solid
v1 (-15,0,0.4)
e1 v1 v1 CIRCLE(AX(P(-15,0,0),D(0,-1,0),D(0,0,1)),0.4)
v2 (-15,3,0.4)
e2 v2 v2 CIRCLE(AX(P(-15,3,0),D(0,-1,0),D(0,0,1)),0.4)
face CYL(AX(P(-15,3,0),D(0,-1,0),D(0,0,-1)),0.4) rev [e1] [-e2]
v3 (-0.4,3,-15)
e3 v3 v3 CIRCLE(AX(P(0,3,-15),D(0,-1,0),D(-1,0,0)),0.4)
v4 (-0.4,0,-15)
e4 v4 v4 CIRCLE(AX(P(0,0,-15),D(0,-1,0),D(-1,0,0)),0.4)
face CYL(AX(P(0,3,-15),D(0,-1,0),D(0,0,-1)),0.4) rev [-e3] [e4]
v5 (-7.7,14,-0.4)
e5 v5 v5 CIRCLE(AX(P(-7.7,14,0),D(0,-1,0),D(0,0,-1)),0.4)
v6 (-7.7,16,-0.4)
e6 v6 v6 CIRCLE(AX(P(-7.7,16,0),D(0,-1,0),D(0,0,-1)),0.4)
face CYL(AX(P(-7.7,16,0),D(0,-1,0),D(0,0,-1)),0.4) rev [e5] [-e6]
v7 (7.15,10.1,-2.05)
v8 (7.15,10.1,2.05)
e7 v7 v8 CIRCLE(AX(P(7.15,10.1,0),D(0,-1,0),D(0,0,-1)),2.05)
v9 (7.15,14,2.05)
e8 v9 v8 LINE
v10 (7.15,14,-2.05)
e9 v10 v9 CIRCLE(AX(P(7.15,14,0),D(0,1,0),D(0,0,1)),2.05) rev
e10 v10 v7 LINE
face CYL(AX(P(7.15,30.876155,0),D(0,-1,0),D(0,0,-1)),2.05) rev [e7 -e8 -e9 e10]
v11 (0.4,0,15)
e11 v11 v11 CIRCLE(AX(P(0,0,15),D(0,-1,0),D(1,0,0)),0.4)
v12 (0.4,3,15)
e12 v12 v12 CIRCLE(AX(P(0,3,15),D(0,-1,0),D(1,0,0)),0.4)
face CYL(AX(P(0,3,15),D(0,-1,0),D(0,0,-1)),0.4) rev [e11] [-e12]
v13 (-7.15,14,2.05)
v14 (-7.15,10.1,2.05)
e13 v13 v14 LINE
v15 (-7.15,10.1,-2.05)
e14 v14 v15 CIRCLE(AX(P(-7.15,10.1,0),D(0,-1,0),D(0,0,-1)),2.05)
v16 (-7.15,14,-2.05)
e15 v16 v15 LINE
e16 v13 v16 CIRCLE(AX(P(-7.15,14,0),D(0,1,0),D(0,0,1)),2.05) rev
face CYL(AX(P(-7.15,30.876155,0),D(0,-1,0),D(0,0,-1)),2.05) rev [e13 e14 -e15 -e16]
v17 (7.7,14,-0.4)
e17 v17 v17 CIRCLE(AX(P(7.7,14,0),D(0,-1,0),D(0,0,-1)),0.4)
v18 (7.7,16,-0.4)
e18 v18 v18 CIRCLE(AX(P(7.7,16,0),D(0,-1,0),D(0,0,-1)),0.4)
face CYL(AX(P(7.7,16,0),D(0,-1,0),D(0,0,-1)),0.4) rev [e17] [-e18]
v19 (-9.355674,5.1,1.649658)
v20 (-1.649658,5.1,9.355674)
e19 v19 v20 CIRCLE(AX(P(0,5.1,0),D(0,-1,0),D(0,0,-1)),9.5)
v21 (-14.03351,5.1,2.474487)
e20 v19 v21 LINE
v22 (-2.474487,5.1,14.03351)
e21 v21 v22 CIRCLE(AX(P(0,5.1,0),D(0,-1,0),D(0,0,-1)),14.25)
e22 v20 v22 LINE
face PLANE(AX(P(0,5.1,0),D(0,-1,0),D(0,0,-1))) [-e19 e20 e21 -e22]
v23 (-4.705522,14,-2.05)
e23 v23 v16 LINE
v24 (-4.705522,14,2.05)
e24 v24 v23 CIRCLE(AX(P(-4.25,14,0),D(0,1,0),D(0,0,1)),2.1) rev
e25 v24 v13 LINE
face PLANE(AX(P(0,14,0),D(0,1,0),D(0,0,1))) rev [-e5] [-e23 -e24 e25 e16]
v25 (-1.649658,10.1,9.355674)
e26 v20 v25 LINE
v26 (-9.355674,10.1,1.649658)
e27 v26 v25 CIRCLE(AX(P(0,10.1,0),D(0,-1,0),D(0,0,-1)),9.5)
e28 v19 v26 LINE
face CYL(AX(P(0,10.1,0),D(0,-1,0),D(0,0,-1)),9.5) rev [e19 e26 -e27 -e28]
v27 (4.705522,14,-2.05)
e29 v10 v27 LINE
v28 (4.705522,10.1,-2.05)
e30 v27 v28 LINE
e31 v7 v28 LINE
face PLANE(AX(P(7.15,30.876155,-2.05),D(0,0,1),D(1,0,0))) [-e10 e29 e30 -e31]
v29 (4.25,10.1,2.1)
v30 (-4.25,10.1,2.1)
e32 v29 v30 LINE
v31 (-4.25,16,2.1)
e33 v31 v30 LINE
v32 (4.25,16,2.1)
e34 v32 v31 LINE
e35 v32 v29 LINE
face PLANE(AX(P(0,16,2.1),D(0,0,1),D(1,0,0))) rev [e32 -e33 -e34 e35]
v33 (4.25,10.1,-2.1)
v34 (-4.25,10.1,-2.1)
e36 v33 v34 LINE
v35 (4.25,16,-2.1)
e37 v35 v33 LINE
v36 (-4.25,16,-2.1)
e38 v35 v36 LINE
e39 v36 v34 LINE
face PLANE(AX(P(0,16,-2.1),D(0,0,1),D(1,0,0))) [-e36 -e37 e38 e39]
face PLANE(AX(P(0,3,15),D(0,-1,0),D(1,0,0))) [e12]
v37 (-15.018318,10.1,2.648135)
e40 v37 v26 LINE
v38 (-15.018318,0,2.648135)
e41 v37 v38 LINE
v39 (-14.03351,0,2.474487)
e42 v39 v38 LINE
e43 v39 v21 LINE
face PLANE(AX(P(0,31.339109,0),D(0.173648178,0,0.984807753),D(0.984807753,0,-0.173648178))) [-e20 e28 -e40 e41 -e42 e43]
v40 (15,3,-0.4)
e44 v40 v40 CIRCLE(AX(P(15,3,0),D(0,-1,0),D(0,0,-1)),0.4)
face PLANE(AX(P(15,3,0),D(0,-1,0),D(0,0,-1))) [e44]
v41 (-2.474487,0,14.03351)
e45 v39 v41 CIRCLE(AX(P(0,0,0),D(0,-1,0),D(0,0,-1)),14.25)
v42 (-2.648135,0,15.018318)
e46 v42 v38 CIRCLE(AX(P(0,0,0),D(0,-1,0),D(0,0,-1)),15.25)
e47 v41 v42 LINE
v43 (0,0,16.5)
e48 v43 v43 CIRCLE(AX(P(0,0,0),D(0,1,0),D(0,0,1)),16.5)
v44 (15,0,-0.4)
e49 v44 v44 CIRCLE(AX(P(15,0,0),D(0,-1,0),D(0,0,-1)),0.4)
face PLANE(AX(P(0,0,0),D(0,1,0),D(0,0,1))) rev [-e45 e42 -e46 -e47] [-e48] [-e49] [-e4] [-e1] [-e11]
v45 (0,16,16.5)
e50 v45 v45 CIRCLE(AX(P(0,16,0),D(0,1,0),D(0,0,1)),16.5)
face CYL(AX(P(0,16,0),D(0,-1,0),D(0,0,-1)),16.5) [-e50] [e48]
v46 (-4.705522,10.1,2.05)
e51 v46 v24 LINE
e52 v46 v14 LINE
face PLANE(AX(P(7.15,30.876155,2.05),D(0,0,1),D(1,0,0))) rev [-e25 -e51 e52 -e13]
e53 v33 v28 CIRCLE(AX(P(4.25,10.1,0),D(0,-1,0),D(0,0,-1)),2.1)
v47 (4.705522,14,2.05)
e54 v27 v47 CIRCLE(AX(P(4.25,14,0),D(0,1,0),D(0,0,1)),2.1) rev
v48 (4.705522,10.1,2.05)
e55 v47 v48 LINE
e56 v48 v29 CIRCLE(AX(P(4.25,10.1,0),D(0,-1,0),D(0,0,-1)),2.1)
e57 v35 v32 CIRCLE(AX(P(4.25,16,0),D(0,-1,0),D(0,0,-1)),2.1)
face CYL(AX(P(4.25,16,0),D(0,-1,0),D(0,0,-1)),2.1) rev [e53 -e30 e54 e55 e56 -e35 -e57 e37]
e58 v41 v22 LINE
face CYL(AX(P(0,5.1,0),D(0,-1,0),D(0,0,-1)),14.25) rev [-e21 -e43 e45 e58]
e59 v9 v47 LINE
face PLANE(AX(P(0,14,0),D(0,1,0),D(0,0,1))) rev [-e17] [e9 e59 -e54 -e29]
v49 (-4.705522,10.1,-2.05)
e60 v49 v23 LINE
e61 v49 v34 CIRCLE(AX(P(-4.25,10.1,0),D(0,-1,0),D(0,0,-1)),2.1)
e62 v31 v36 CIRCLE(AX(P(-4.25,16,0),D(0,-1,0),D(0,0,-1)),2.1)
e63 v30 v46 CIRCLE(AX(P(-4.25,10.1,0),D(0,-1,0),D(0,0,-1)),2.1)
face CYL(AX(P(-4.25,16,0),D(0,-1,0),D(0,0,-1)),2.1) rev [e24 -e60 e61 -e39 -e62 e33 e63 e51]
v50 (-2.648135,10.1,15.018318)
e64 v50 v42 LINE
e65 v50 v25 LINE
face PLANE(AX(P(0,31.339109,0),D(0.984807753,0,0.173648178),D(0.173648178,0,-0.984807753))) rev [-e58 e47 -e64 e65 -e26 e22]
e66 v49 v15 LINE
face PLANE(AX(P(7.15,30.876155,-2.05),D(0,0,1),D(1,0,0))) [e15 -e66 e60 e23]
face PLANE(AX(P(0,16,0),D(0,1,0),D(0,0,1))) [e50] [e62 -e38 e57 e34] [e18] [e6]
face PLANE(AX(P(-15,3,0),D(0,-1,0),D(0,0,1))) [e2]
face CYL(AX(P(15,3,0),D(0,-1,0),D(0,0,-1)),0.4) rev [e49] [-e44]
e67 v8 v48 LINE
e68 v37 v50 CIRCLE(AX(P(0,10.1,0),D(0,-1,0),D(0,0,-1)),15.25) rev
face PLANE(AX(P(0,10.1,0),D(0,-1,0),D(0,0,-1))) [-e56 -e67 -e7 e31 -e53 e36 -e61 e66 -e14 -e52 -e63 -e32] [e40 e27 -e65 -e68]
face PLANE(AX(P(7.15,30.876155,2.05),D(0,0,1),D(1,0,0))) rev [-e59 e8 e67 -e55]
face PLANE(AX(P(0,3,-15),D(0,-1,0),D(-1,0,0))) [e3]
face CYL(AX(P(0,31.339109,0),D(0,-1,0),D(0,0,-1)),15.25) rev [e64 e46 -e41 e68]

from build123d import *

# Parameters (mm, degrees)
SKETCH_1_R               = 16.5
EXTRUDE_1_DEPTH          = 16
SKETCH_2_R               = 14.25
CUT_EXTRUDE_1_DEPTH      = 5.1
SKETCH_3_R               = 9.5
CUT_EXTRUDE_2_DEPTH      = 5
CUT_EXTRUDE_3_DEPTH      = 29.293108702
CUT_EXTRUDE_START        = -14
CUT_EXTRUDE_4_DEPTH      = 3.9
SKETCH_6_R               = 0.4
CUT_EXTRUDE_5_DEPTH      = 2
SKETCH_7_R               = 0.4
CUT_EXTRUDE_6_DEPTH      = 3
PATTERN_CIRCULAR_1_COUNT = 4
CUT_EXTRUDE_START_2      = -10.1
CUT_EXTRUDE_7_DEPTH      = 10.1


# Read off the part's stored shape, not the designer's step: 切除-拉伸4
with BuildPart() as part:
    # 草图1 → 凸台-拉伸1 (new body)
    with BuildSketch(Plane(origin=(0, 0, 0), x_dir=(1, 0, 0), z_dir=(0, 1, 0))):
        with Locations(Location((0, 0, 0), (0, 0, 270))):
            Circle(SKETCH_1_R)
    extrude(amount=EXTRUDE_1_DEPTH)

    # 草图2 → 切除-拉伸1 (cut)
    with BuildSketch(Plane(origin=(0, 0, 0), x_dir=(-1, 0, 0), z_dir=(0, -1, 0))):
        with Locations(Location((0, 0, 0), (0, 0, 90))):
            Circle(SKETCH_2_R)
    extrude(amount=-CUT_EXTRUDE_1_DEPTH, mode=Mode.SUBTRACT)

    # 草图3 → 切除-拉伸2 (cut)
    with BuildSketch(Plane.XZ.offset(-5.1)):
        with Locations(Location((0, 0, 0), (0, 0, 270))):
            Circle(SKETCH_3_R)
    extrude(amount=-CUT_EXTRUDE_2_DEPTH, mode=Mode.SUBTRACT)

    # 草图4 → 切除-拉伸3 (cut, through all)
    with BuildSketch(Plane.XZ):
        with BuildLine():
            ThreePointArc((-2.15, 0), (-2.76507576, 1.48492424), (-4.25, 2.1))
            Line((-4.25, 2.1), (-4.25, -2.1))
            ThreePointArc((-4.25, -2.1), (-2.76507576, -1.48492424), (-2.15, 0))
        make_face()
        with BuildLine():
            Line((-4.25, -2.1), (-4.25, 2.1))
            ThreePointArc((-4.25, 2.1), (-6.35, 0), (-4.25, -2.1))
        make_face()
        with BuildLine():
            ThreePointArc((4.25, -2.1), (2.15, 0), (4.25, 2.1))
            Line((4.25, 2.1), (-4.25, 2.1))
            ThreePointArc((-4.25, 2.1), (-2.76507576, 1.48492424), (-2.15, 0))
            ThreePointArc((-2.15, 0), (-2.76507576, -1.48492424), (-4.25, -2.1))
            Line((-4.25, -2.1), (4.25, -2.1))
        make_face()
        with BuildLine():
            ThreePointArc((6.35, 0), (5.73492424, 1.48492424), (4.25, 2.1))
            Line((4.25, 2.1), (4.25, -2.1))
            ThreePointArc((4.25, -2.1), (5.73492424, -1.48492424), (6.35, 0))
        make_face()
        with BuildLine():
            Line((4.25, -2.1), (4.25, 2.1))
            ThreePointArc((4.25, 2.1), (2.15, 0), (4.25, -2.1))
        make_face()
    extrude(amount=-CUT_EXTRUDE_3_DEPTH, mode=Mode.SUBTRACT)

    # 切除-拉伸4 outline → 切除-拉伸4 (cut)
    with BuildSketch(Plane.XZ.offset(CUT_EXTRUDE_START)):
        with BuildLine():
            ThreePointArc((7.15, -2.05), (9.2, 0), (7.15, 2.05))
            Line((7.15, 2.05), (4.705521679, 2.05))
            ThreePointArc((4.705521679, 2.05), (6.35, 0), (4.705521679, -2.05))
            Line((4.705521679, -2.05), (7.15, -2.05))
        make_face()
        with BuildLine():
            ThreePointArc((-4.705521679, -2.05), (-6.35, 0), (-4.705521679, 2.05))
            Line((-4.705521679, 2.05), (-7.15, 2.05))
            ThreePointArc((-7.15, 2.05), (-9.2, 0), (-7.15, -2.05))
            Line((-7.15, -2.05), (-4.705521679, -2.05))
        make_face()
    extrude(amount=CUT_EXTRUDE_4_DEPTH, mode=Mode.SUBTRACT)

    # 草图6 → 切除-拉伸5 (cut)
    with BuildSketch(Plane.XZ.offset(-14)):
        with Locations(Location((7.7, 0, 0), (0, 0, 270))):
            Circle(SKETCH_6_R)
        with Locations(Location((-7.7, 0, 0), (0, 0, 270))):
            Circle(SKETCH_6_R)
    extrude(amount=-CUT_EXTRUDE_5_DEPTH, mode=Mode.SUBTRACT)

    # 草图7 → 切除-拉伸6 (cut)
    with BuildSketch(Plane.XZ):
        with Locations(Location((15, 0, 0), (0, 0, 270))):
            Circle(SKETCH_7_R)
    cut_extrude_6 = extrude(amount=-CUT_EXTRUDE_6_DEPTH, mode=Mode.SUBTRACT)

    # 阵列(圆周)1: 切除-拉伸6 ×4 about axis
    pattern_circular_1_axis = Axis((0, 0, 0), (0, 1, 0))
    for i in range(1, PATTERN_CIRCULAR_1_COUNT):
        add(cut_extrude_6.rotate(pattern_circular_1_axis, i * 360 / PATTERN_CIRCULAR_1_COUNT), mode=Mode.SUBTRACT)

    # 草图8 → 切除-拉伸7 (cut)
    with BuildSketch(Plane.XZ.offset(CUT_EXTRUDE_START_2)):
        with BuildLine():
            Line((-14.03351048, 2.474486532), (0, 0))
            Line((0, 0), (-2.474486532, 14.03351048))
            ThreePointArc((-2.474486532, 14.03351048), (-10.076271632, 10.076271632), (-14.03351048, 2.474486532))
        make_face()
        with BuildLine():
            Line((-15.018318233, 2.648134709), (-14.03351048, 2.474486532))
            ThreePointArc((-14.03351048, 2.474486532), (-10.076271632, 10.076271632), (-2.474486532, 14.03351048))
            Line((-2.474486532, 14.03351048), (-2.648134709, 15.018318233))
            ThreePointArc((-2.648134709, 15.018318233), (-10.783378413, 10.783378413), (-15.018318233, 2.648134709))
        make_face()
    extrude(amount=CUT_EXTRUDE_7_DEPTH, mode=Mode.SUBTRACT)


solid = part.part
